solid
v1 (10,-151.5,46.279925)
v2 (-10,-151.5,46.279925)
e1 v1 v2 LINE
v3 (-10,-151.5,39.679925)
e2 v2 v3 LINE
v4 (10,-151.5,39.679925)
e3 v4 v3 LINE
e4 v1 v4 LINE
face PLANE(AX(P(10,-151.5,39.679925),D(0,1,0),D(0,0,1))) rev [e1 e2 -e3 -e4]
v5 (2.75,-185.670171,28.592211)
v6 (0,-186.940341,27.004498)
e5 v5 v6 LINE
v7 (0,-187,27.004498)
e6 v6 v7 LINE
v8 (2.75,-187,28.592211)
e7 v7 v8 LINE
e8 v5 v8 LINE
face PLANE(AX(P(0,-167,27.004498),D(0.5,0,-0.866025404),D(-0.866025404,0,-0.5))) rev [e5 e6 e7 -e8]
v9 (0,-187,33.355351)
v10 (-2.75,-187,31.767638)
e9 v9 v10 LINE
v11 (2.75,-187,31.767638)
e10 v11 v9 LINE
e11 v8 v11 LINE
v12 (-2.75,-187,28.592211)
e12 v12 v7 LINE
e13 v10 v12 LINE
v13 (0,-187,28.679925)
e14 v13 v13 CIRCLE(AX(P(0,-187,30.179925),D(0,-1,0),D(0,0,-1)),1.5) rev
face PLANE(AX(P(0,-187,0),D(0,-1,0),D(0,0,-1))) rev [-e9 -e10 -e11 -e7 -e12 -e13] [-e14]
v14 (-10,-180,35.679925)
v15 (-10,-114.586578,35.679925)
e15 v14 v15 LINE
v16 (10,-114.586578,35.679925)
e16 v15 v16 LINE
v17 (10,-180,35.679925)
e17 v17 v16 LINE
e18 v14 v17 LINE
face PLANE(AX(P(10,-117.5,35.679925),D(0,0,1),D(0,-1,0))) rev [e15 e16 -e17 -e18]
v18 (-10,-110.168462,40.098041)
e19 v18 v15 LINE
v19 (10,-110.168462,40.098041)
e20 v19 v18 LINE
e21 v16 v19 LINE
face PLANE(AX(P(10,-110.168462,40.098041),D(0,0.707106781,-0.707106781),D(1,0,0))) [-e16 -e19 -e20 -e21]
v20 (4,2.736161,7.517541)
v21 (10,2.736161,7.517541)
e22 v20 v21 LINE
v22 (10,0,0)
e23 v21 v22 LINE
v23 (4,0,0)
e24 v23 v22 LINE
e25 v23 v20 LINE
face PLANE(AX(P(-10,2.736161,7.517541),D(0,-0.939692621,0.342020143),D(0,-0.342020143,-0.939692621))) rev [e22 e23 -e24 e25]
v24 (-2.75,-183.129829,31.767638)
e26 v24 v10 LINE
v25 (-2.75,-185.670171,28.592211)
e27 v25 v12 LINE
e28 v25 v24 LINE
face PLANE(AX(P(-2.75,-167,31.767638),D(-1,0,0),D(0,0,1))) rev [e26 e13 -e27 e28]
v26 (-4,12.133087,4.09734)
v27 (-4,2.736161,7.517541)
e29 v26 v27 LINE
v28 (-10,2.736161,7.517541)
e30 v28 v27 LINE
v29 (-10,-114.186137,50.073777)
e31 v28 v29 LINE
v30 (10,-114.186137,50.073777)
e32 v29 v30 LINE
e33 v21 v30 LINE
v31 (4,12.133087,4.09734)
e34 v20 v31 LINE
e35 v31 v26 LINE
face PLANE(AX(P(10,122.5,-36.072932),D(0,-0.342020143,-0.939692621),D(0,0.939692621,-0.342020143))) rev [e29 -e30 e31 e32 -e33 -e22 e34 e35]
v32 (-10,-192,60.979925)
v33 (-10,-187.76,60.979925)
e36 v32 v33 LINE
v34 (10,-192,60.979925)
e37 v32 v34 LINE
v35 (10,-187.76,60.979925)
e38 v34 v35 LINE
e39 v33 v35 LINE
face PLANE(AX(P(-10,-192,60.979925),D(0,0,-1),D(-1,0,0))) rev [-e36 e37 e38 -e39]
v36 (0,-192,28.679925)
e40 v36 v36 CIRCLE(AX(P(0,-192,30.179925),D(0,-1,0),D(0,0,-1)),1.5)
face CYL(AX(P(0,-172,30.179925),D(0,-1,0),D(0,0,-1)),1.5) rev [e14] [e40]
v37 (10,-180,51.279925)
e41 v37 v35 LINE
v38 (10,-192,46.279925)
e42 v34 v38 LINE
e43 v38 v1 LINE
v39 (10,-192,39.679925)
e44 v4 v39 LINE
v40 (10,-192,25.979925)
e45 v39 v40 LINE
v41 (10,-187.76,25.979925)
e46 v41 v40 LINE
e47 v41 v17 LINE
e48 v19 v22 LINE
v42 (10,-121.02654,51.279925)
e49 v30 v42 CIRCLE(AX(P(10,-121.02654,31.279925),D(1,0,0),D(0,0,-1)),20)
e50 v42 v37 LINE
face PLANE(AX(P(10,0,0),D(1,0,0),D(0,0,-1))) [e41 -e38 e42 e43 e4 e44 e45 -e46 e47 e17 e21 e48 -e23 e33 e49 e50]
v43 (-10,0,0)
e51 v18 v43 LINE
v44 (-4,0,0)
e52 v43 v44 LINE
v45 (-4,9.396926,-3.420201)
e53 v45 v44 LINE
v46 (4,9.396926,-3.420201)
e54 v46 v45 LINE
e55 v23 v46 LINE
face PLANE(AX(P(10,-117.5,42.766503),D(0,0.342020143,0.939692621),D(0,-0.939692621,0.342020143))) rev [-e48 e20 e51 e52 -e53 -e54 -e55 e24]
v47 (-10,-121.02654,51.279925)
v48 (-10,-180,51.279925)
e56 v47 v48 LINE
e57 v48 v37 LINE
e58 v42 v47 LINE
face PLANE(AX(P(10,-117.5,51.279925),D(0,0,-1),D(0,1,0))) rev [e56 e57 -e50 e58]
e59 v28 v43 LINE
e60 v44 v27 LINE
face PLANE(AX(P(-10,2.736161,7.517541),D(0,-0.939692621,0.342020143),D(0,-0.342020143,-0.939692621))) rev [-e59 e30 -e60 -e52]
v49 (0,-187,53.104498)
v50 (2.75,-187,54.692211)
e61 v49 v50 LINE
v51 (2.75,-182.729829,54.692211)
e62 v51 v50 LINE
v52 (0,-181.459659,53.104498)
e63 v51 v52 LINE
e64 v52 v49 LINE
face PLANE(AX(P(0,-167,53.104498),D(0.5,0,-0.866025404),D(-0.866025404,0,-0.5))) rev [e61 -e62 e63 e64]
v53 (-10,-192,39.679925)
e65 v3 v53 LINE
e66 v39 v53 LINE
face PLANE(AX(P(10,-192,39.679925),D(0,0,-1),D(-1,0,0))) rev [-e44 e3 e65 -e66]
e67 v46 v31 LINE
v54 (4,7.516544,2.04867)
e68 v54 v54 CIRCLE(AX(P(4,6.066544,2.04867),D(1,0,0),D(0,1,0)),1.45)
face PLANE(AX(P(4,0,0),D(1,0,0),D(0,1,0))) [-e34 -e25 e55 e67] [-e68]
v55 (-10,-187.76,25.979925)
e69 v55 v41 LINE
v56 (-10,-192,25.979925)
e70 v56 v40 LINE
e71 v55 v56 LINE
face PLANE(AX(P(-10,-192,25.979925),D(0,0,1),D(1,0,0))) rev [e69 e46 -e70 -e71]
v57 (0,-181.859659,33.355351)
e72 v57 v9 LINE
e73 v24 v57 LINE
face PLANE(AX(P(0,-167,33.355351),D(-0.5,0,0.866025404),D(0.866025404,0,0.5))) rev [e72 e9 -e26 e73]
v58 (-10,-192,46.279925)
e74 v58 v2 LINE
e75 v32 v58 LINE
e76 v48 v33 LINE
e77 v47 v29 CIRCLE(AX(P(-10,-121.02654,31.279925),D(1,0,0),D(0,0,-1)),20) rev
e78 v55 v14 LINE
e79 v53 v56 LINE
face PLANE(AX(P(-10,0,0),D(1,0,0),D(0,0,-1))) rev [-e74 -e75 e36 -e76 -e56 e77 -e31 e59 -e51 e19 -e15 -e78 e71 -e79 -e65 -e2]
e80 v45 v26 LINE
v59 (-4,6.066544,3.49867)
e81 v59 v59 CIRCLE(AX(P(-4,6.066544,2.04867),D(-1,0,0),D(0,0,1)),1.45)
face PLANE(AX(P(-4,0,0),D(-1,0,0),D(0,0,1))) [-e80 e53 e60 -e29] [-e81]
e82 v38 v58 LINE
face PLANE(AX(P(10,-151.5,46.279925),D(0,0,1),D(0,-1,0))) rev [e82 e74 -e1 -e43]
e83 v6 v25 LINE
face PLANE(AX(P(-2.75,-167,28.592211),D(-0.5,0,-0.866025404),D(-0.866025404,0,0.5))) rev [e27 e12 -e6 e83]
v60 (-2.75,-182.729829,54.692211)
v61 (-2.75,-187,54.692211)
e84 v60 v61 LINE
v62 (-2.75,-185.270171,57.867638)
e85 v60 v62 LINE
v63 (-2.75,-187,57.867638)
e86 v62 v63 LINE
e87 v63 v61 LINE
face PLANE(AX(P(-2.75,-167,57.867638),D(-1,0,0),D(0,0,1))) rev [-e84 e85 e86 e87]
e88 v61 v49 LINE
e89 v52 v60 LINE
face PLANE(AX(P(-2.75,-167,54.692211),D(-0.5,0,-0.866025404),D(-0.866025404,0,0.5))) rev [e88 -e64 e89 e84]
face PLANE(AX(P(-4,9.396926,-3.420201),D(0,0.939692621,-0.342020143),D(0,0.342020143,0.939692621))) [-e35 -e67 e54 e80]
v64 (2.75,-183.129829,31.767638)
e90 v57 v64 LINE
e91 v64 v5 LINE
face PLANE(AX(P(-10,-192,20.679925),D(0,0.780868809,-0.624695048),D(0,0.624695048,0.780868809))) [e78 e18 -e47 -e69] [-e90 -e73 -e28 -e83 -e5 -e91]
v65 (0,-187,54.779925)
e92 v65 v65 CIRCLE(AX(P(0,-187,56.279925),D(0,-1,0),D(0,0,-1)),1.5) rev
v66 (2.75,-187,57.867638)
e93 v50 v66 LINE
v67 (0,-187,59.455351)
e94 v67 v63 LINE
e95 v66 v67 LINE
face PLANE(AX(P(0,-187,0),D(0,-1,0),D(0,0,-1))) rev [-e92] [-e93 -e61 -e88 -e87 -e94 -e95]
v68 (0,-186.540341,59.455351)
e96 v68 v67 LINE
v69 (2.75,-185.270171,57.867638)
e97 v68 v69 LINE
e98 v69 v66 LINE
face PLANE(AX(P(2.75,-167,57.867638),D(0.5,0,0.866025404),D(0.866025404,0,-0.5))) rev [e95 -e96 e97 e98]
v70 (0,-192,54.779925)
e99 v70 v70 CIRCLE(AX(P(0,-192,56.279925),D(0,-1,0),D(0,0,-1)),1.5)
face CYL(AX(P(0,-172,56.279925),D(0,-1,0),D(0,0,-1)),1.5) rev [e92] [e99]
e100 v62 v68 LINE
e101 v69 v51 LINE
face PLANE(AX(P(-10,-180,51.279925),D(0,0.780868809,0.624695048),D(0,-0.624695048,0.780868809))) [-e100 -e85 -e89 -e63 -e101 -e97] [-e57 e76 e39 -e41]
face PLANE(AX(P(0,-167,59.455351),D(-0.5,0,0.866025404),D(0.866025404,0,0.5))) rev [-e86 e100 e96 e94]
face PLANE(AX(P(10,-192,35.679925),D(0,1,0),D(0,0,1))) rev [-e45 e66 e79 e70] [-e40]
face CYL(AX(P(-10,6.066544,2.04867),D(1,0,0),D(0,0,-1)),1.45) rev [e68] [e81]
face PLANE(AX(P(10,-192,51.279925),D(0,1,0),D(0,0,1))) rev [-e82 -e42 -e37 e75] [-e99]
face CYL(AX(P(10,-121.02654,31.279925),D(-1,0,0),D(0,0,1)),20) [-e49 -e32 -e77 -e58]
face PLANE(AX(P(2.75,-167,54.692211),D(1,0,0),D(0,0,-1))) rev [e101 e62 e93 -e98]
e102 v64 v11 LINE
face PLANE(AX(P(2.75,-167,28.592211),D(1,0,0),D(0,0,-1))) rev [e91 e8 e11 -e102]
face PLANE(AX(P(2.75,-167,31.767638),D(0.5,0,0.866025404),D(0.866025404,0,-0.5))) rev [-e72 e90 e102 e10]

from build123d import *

# Parameters (mm, degrees)
BOSS_EXTRUDE1_DEPTH = 10
CHAMFER1_SIZE       = 7.802060087
CHAMFER1_SIZE_2     = 10
BOSS_EXTRUDE2_DEPTH = 20
SKETCH7_R           = 1.5
CUT_EXTRUDE1_DEPTH  = 20
CUT_EXTRUDE3_DEPTH  = 20
FILLET5_R           = 20
FILLET6_R           = 10
SKETCH10_W          = 5.3
SKETCH10_H          = 4.24
CUT_EXTRUDE4_DEPTH  = 273.805653344
SKETCH11_W          = 3.75
SKETCH11_H          = 144.691495626
CUT_EXTRUDE5_DEPTH  = 370.011076387
BOSS_EXTRUDE4_DEPTH = 12.5
SKETCH12_W          = 2
SKETCH12_H          = 1.5
CUT_EXTRUDE6_DEPTH  = 144.691496
CUT_EXTRUDE7_DEPTH  = 273.805653344
SKETCH15_W          = 8
SKETCH15_H          = 10
BOSS_EXTRUDE5_DEPTH = 8
SKETCH16_R          = 1.45
CUT_EXTRUDE9_DEPTH  = 203.44147603


with BuildPart() as part:
    # Sketch2 → Boss-Extrude1 (new, symmetric)
    with BuildSketch(Plane(origin=(0, 0, 0), x_dir=(0, 0, -1), z_dir=(1, 0, 0))):
        Polygon((36.072931518, 122.5), (-51.279924706, -117.5), (-51.279924706, -192), (-46.279924706, -192), (-46.279924706, -151.5), (-39.679924706, -151.5), (-39.679924706, -192), (-35.679924706, -192), (-35.679924706, -117.5), (-42.766502526, -117.5), (42.766502526, 117.5), (192.766502526, 117.5), (192.766502526, 122.5), align=None)
    extrude(amount=BOSS_EXTRUDE1_DEPTH, both=True)

    # Chamfer1
    # the kernel refuses this chamfer: 10, 7.802060087 mm, written as the material it adds along each edge
    with BuildSketch(Plane(origin=(-10, -117.5, 42.766502526), x_dir=(0, 0.9542611885293297, -0.298974219735734), z_dir=(1, 0, 0))) as chamfer1_piece_1_section:
        Polygon((CHAMFER1_SIZE * 0.998967402661, -CHAMFER1_SIZE * 0.0454326803806), (CHAMFER1_SIZE_2 * 0.298974219736, -CHAMFER1_SIZE_2 * 0.954261188529), (0, 0), align=None)
    chamfer1_piece_1 = extrude(amount=20, mode=Mode.PRIVATE)
    chamfer1_piece_1 = split(chamfer1_piece_1, bisect_by=Plane(origin=(0, -114.855220314, 35.679924706), z_dir=(0, 0, 1)), keep=Keep.TOP, mode=Mode.PRIVATE)
    add(chamfer1_piece_1)

    # Sketch6 → Boss-Extrude2 (add)
    with BuildSketch(Plane(origin=(10, 0, 0), x_dir=(0, 0, -1), z_dir=(1, 0, 0))):
        Polygon((-51.279924706, -180), (-66.279924706, -192), (-51.279924706, -192), align=None)
        Polygon((-35.679924706, -192), (-20.679924706, -192), (-35.679924706, -180), align=None)
    extrude(amount=-BOSS_EXTRUDE2_DEPTH)

    # Sketch7 → Cut-Extrude1 (cut)
    with BuildSketch(Plane(origin=(0, -192, 0), x_dir=(-1, 0, 0), z_dir=(0, -1, 0))):
        with Locations(Location((0, -56.279924706, 0), (0, 0, 90))):
            Circle(SKETCH7_R)
        with Locations(Location((0, -30.179924706, 0), (0, 0, 90))):
            Circle(SKETCH7_R)
    extrude(amount=-CUT_EXTRUDE1_DEPTH, mode=Mode.SUBTRACT)

    # Sketch9 → Cut-Extrude3 (cut)
    with BuildSketch(Plane(origin=(0, -187, 0), x_dir=(-1, 0, 0), z_dir=(0, -1, 0))):
        Polygon((2.75, -57.867637946), (2.75, -54.692211466), (0, -53.104498226), (-2.75, -54.692211466), (-2.75, -57.867637946), (0, -59.455351187), align=None)
        Polygon((2.75, -31.767637946), (2.75, -28.592211466), (0, -27.004498226), (-2.75, -28.592211466), (-2.75, -31.767637946), (0, -33.355351187), align=None)
    extrude(amount=-CUT_EXTRUDE3_DEPTH, mode=Mode.SUBTRACT)

    # Fillet5
    fillet5_edges = [part.edges().sort_by_distance(p)[0] for p in [
        (0, -117.5, 51.279924706),
    ]]
    fillet(fillet5_edges, radius=FILLET5_R)

    # Fillet6
    fillet6_edges = [part.edges().sort_by_distance(p)[0] for p in [
        (0, 122.5, -36.072931518),
    ]]
    fillet(fillet6_edges, radius=FILLET6_R)

    # Sketch10 → Cut-Extrude4 (cut, through all)
    with BuildSketch(Plane(origin=(10, 0, 0), x_dir=(0, 0, -1), z_dir=(1, 0, 0))):
        with Locations((-63.629924706, -189.88)):
            Rectangle(SKETCH10_W, SKETCH10_H)
        with Locations((-23.329924706, -189.88)):
            Rectangle(SKETCH10_W, SKETCH10_H)
    extrude(amount=-CUT_EXTRUDE4_DEPTH, mode=Mode.SUBTRACT)

    # Sketch11 → Cut-Extrude5 (cut, through all)
    with BuildSketch(Plane(origin=(0, 122.5, 0), x_dir=(1, 0, 0), z_dir=(0, 1, 0))):
        with Locations((-8.125, 120.420754713)):
            Rectangle(SKETCH11_W, SKETCH11_H)
        with Locations((8.125, 120.420754713)):
            Rectangle(SKETCH11_W, SKETCH11_H)
    extrude(amount=-CUT_EXTRUDE5_DEPTH, mode=Mode.SUBTRACT)

    # Sketch13 → Boss-Extrude4 (add)
    with BuildSketch(Plane(origin=(6.25, 0, 0), x_dir=(0, 0, -1), z_dir=(1, 0, 0))):
        Polygon((52.766502526, 117.5), (37.766502526, 103.762612903), (42.766502526, 117.5), align=None)
    extrude(amount=-BOSS_EXTRUDE4_DEPTH)

    # Sketch12 → Cut-Extrude6 (cut)
    with BuildSketch(Plane(origin=(0, 0, -192.766502526), x_dir=(-1, 0, 0), z_dir=(0, 0, -1))):
        with Locations((-5.25, 120)):
            Rectangle(SKETCH12_W, SKETCH12_H)
        with Locations((5.25, 120)):
            Rectangle(SKETCH12_W, SKETCH12_H)
    extrude(amount=-CUT_EXTRUDE6_DEPTH, mode=Mode.SUBTRACT)

    # Sketch14 → Cut-Extrude7 (cut, through all)
    with BuildSketch(Plane(origin=(10, 0, 0), x_dir=(0, 0, -1), z_dir=(1, 0, 0))):
        Polygon((-7.517540966, 2.736161147), (0, 0), (208.269452521, 117.586421331), (208.269452521, 129.478082523), (28.535487637, 129.478082523), align=None)
    extrude(amount=-CUT_EXTRUDE7_DEPTH, mode=Mode.SUBTRACT)

    # Sketch15 → Boss-Extrude5 (add)
    with BuildSketch(Plane(origin=(0, 2.736161147, 7.517540966), x_dir=(1, 0, 0), z_dir=(0, 0.3420201433256657, 0.9396926207859096))):
        with Locations((0, 5)):
            Rectangle(SKETCH15_W, SKETCH15_H)
    extrude(amount=-BOSS_EXTRUDE5_DEPTH)

    # Sketch16 → Cut-Extrude9 (cut, through all)
    with BuildSketch(Plane(origin=(10, 0, 0), x_dir=(0, 0, -1), z_dir=(1, 0, 0))):
        with Locations(Location((-2.048669767, 6.066543677, 0), (0, 0, 90))):
            Circle(SKETCH16_R)
    extrude(amount=-CUT_EXTRUDE9_DEPTH, mode=Mode.SUBTRACT)


solid = part.part
